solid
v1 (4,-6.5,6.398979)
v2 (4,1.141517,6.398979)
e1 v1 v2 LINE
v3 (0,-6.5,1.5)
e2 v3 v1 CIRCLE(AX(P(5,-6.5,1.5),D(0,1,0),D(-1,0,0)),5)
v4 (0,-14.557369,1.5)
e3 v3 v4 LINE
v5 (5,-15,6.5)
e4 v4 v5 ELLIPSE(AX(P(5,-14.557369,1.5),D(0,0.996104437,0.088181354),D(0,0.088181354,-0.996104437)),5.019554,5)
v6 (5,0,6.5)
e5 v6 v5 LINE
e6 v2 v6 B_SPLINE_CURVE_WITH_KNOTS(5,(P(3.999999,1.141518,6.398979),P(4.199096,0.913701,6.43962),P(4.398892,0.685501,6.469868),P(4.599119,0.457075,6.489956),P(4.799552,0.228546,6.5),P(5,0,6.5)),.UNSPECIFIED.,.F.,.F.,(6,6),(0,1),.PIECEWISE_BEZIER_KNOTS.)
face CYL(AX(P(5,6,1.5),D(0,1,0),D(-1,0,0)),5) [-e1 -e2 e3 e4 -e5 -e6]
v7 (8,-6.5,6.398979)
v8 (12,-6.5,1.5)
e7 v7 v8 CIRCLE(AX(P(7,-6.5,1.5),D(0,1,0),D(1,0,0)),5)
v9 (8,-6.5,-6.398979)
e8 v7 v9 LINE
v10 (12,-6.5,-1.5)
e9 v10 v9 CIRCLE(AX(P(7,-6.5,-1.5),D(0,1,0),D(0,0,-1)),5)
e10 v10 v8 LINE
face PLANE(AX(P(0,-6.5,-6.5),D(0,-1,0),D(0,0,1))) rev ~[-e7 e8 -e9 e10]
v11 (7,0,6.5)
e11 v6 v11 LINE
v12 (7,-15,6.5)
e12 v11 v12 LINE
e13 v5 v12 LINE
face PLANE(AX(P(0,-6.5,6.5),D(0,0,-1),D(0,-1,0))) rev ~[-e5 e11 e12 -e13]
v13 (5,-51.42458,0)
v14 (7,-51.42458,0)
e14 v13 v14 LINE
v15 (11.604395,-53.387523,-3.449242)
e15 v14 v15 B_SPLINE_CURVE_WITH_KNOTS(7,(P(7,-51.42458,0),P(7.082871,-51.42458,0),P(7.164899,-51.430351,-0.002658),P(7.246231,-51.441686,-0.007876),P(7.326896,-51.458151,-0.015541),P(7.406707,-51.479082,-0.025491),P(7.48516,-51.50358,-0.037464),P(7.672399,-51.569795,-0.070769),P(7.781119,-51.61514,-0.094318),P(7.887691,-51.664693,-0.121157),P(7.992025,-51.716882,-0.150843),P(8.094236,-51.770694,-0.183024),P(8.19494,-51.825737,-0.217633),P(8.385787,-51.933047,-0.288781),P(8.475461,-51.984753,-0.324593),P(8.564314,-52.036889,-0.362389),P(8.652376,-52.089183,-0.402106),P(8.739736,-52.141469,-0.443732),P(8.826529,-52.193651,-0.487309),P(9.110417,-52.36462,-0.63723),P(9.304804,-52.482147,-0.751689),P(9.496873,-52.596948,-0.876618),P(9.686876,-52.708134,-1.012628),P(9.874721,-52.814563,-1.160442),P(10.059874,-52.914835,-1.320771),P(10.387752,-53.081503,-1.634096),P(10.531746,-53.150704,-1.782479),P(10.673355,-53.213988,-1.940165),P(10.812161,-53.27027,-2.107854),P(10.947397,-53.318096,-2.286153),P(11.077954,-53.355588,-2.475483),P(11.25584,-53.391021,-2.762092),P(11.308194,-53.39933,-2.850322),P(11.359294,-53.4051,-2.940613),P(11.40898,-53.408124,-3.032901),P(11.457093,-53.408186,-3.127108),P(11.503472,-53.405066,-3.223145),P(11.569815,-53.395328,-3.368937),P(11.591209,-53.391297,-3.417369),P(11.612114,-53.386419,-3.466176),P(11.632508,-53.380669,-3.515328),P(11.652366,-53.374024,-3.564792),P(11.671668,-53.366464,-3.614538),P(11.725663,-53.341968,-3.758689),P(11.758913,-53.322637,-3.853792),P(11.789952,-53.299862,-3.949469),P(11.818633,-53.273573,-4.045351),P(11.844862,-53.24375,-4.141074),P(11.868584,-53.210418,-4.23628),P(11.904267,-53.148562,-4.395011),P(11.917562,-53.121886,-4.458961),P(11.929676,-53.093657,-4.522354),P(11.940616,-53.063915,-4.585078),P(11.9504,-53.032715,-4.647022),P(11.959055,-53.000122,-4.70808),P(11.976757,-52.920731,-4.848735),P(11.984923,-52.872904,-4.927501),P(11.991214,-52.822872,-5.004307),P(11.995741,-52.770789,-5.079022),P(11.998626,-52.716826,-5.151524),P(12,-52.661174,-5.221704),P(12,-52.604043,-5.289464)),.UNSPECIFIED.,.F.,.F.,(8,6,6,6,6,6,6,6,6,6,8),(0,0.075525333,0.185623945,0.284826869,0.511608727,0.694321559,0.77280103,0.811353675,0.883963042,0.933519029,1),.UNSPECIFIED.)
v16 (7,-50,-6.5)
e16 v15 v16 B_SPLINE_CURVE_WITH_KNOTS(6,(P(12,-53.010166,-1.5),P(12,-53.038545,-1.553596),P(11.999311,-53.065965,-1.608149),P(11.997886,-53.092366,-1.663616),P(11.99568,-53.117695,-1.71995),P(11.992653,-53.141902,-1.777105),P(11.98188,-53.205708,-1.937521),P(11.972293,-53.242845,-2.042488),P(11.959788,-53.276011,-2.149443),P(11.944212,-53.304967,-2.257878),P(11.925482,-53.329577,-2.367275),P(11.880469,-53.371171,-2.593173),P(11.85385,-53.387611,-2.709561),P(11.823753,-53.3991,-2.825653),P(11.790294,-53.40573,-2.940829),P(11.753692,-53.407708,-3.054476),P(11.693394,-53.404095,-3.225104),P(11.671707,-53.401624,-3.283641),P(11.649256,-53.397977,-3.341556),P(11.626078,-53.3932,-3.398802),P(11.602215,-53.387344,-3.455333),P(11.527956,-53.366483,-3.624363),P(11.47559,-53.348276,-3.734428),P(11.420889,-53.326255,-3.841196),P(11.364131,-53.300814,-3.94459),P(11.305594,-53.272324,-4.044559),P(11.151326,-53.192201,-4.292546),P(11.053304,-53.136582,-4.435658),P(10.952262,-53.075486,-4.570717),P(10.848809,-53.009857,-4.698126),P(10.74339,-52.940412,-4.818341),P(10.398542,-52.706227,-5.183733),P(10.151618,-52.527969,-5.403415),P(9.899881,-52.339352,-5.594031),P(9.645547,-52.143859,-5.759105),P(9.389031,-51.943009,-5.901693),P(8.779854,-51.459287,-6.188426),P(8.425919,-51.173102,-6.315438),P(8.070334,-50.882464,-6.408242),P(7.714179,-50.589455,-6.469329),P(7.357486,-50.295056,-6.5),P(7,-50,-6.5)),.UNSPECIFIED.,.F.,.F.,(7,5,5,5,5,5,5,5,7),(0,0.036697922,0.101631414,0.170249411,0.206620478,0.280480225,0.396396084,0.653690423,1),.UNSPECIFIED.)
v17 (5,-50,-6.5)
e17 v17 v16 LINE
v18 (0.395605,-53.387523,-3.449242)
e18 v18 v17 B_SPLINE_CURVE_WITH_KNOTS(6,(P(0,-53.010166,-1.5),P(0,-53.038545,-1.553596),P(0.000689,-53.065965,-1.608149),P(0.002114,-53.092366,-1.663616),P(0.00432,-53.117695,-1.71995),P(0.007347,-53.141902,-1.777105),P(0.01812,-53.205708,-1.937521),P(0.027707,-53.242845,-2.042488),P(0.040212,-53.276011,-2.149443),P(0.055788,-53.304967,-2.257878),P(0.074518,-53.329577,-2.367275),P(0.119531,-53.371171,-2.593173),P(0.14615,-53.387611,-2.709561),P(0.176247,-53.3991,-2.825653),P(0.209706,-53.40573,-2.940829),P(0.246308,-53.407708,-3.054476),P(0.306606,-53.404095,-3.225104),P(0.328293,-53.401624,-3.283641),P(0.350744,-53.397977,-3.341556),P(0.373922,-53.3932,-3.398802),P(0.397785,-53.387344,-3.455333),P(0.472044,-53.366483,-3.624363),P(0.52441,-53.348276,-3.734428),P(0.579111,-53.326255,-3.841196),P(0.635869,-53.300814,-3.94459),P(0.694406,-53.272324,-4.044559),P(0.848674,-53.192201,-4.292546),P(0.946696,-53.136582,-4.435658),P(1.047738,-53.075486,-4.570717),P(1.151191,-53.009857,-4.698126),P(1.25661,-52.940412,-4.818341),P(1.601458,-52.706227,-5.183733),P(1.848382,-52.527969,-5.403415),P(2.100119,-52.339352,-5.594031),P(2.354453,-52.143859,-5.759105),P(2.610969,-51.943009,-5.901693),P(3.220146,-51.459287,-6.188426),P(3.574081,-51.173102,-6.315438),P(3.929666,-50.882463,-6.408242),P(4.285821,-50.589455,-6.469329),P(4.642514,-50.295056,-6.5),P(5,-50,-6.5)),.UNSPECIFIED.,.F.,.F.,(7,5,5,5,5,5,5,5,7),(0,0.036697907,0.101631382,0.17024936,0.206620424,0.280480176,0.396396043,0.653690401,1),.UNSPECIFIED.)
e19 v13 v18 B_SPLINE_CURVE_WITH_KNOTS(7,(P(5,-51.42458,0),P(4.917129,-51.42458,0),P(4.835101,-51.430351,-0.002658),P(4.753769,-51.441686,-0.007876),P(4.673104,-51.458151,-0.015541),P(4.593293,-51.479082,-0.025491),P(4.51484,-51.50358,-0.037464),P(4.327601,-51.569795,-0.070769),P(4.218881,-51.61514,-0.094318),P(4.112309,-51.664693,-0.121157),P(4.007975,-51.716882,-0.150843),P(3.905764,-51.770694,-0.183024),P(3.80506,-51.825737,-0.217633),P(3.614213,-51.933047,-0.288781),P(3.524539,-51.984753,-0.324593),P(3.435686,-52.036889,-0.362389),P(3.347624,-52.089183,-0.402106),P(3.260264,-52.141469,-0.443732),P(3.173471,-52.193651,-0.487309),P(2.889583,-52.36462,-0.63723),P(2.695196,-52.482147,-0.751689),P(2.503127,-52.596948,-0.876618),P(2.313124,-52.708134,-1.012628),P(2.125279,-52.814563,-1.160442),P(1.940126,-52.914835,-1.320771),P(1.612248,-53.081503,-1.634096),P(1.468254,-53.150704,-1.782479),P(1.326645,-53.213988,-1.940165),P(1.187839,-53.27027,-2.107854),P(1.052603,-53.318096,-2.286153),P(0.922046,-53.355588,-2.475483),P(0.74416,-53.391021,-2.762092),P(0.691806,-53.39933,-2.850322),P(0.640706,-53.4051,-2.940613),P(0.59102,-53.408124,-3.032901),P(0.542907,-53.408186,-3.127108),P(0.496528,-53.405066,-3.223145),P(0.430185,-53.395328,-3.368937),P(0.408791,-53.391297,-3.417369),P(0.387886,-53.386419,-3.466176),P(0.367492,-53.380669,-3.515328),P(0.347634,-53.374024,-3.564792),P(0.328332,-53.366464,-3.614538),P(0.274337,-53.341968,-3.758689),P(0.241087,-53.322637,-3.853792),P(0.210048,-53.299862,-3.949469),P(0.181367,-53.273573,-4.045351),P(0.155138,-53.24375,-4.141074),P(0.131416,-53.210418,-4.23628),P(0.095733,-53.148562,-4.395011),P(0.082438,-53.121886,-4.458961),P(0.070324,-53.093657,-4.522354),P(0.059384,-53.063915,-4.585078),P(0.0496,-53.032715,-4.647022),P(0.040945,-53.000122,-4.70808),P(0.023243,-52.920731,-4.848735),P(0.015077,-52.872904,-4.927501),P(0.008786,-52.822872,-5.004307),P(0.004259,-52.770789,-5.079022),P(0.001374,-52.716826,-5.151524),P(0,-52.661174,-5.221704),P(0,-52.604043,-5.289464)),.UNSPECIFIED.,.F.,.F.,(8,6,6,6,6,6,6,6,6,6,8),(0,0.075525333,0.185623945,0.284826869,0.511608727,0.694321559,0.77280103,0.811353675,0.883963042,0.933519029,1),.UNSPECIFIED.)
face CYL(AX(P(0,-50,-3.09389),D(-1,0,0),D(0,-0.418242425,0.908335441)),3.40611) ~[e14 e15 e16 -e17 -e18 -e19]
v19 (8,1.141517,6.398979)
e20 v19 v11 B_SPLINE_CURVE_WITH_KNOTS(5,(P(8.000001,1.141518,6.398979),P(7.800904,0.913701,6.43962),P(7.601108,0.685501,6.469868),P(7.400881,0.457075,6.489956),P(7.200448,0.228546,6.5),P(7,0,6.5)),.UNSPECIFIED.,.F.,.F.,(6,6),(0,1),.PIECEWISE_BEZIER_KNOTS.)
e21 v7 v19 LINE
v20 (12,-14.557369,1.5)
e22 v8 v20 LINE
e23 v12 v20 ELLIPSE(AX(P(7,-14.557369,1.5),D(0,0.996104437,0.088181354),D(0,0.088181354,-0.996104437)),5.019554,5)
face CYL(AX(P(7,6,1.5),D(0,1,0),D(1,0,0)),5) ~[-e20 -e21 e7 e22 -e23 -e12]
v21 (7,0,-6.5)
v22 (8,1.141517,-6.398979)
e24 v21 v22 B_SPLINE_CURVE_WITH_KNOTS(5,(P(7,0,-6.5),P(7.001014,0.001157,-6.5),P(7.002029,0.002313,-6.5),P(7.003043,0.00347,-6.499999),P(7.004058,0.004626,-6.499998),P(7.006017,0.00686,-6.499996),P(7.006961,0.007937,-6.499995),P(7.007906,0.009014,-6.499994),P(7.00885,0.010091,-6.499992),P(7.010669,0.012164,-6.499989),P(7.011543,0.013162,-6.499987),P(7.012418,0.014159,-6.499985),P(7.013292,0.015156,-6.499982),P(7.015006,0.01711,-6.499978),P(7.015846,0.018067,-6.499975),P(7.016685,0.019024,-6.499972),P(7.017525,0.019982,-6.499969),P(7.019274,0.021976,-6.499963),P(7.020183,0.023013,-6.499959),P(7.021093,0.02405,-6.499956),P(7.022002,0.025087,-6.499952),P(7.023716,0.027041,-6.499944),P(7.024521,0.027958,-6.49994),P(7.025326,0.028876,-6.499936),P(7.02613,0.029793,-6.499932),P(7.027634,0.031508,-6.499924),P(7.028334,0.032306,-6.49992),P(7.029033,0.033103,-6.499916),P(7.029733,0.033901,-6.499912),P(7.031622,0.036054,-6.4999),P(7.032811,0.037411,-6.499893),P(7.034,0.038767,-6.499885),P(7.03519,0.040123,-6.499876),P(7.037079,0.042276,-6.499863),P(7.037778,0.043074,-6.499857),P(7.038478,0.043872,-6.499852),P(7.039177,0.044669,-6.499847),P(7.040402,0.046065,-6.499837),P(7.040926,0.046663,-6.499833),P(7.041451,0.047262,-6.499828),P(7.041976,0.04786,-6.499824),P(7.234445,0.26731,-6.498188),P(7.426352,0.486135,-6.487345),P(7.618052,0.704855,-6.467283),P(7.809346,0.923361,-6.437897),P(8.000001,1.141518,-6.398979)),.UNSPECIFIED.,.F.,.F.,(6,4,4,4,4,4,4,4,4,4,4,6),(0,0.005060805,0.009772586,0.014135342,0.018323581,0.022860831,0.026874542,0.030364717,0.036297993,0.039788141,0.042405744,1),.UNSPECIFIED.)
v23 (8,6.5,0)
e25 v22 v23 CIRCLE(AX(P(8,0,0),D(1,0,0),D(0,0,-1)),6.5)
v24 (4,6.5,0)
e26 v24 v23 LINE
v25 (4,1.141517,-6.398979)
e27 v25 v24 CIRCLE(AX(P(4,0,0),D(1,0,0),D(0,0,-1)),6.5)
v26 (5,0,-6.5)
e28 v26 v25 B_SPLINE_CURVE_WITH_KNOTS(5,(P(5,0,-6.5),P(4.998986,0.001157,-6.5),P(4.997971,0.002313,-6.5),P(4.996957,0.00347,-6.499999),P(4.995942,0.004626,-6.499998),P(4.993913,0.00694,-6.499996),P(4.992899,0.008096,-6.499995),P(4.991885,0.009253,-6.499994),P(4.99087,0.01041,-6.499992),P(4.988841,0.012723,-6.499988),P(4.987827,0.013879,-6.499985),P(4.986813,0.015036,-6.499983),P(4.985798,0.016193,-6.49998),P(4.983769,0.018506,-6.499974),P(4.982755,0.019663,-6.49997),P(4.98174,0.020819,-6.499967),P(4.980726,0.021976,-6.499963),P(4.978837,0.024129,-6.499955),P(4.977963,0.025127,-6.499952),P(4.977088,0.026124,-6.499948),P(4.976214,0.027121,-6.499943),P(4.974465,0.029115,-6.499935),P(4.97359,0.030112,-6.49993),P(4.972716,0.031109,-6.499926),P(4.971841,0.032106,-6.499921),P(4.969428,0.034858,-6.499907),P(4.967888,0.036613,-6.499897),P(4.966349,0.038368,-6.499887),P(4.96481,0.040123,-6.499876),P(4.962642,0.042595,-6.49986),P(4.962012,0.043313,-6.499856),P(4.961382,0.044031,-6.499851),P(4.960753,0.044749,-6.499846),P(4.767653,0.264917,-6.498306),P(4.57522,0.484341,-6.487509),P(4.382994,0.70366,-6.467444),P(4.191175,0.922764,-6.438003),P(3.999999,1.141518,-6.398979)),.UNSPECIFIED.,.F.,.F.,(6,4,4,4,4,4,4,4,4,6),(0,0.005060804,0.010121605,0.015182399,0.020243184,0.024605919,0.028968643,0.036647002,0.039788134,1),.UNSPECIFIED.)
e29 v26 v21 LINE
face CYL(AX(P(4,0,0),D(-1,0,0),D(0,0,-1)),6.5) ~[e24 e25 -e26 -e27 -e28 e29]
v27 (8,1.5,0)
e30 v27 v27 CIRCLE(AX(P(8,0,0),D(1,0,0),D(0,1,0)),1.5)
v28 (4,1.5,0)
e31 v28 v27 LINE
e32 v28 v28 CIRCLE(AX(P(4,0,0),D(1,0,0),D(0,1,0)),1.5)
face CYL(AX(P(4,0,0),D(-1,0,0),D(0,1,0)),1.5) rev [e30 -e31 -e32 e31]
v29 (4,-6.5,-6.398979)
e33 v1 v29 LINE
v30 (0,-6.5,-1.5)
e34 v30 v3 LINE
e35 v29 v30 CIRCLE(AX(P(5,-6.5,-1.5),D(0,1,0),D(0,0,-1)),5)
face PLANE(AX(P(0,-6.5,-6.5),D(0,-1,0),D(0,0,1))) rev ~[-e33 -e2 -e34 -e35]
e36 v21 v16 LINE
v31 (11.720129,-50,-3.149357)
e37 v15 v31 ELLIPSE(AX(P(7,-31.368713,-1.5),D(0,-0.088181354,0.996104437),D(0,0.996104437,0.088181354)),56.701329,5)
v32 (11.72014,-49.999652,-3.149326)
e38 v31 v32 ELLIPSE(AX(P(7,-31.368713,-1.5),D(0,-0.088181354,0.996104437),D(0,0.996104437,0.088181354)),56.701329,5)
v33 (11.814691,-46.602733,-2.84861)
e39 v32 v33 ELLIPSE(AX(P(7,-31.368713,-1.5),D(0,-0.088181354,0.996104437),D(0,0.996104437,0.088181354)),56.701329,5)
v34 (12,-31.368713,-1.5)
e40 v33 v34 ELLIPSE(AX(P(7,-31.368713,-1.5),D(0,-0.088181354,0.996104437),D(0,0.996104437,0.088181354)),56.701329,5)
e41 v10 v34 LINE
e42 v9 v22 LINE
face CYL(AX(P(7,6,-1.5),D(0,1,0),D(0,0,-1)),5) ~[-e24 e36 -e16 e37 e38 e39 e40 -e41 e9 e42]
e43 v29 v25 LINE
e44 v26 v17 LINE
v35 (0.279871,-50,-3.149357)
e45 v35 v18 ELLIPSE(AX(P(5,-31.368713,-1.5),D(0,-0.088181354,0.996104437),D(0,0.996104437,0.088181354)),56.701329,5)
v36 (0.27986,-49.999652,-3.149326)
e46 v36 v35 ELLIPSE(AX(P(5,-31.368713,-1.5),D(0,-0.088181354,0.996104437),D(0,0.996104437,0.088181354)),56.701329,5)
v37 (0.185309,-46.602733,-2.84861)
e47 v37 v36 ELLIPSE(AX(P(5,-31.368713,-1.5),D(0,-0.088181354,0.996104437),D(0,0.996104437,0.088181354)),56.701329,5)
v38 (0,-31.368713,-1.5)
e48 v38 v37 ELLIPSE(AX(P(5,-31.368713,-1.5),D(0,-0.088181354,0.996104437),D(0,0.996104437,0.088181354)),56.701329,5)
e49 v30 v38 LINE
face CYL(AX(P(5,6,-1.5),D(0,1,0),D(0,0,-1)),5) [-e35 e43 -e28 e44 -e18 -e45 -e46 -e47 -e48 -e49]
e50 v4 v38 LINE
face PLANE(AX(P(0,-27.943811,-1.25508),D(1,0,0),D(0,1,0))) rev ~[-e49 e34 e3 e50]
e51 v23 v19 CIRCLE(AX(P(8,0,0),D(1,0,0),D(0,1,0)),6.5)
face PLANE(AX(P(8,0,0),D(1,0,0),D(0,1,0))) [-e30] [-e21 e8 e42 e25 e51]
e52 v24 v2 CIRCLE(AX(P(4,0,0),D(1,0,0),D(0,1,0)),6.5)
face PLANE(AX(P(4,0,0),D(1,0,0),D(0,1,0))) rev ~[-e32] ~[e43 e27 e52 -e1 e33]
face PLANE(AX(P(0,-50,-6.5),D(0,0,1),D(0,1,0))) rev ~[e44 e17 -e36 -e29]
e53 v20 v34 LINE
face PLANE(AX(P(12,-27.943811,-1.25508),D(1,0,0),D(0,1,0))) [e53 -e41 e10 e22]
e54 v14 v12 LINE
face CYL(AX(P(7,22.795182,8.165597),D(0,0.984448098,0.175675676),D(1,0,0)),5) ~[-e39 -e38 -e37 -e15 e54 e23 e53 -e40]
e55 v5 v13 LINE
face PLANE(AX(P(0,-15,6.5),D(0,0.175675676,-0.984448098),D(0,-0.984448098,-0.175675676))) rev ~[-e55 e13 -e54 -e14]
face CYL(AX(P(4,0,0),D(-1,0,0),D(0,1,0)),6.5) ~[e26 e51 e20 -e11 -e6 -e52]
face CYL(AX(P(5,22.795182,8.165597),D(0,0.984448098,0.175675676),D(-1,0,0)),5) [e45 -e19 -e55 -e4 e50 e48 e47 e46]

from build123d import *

# Parameters (mm, degrees)
F1_DEPTH     = 12
F2_START     = 4
F0_R         = 1.5
F2_DEPTH     = 4
F3_T1_DEPTH  = 58.5
F3_T3_DEPTH  = 87
F3_T5_DEPTH  = 68.5
F3_T10_ANGLE = 359.64
F3_S11_R     = 5
F3_T12_DEPTH = 7
F3_T16_ANGLE = 359.64
F3_S17_R     = 5
F3_T18_DEPTH = 7
F3_T22_ANGLE = 359.64
F3_S23_R     = 5
F3_T24_DEPTH = 7
F3_T28_ANGLE = 359.64
F3_S29_R     = 5
F3_T30_DEPTH = 7


# Not quite as in the source:
# - a fillet or chamfer that OpenCascade refuses, or shapes differently, is made with other operations: its cross-section is extruded or revolved along the edge and cut away or added


with BuildPart() as f1:
    # F0 (on Right) → F1 (new body)
    with BuildSketch(Plane.YZ):
        with BuildLine():
            Line((-6.5, -6.5), (-6.5, 0))
            Line((-6.5, 0), (-6.5, 6.5))
            Line((-6.5, 6.5), (-15, 6.5))
            Line((-15, 6.5), (-51.4245796132, 0))
            ThreePointArc((-51.4245796132, 0), (-53.3271394273, -3.8230863787), (-50, -6.5))
            Line((-50, -6.5), (-6.5, -6.5))
        make_face()
    extrude(amount=F1_DEPTH)

    # F0 (on Right) → F2 (join)
    with BuildSketch(Plane.YZ.offset(F2_START)):
        with BuildLine():
            ThreePointArc((0, -6.5), (4.5961940777, -4.5961940777), (6.5, 0))
            ThreePointArc((6.5, 0), (4.5961940777, 4.5961940777), (0, 6.5))
            ThreePointArc((0, 6.5), (-4.5961940777, 4.5961940777), (-6.5, 0))
            ThreePointArc((-6.5, 0), (-4.5961940777, -4.5961940777), (0, -6.5))
        make_face()
        Circle(F0_R, mode=Mode.SUBTRACT)
        with BuildLine():
            ThreePointArc((-6.5, 0), (-4.5961940777, 4.5961940777), (0, 6.5))
            Line((0, 6.5), (-6.5, 6.5))
            Line((-6.5, 6.5), (-6.5, 0))
        make_face()
        with BuildLine():
            Line((-6.5, -6.5), (0, -6.5))
            ThreePointArc((0, -6.5), (-4.5961940777, -4.5961940777), (-6.5, 0))
            Line((-6.5, 0), (-6.5, -6.5))
        make_face()
    extrude(amount=F2_DEPTH)

    # F3: fillet of radius 5 on 6 edges, made by hand

    # F3_s2 → F3_t1 (cut)
    with BuildSketch(Plane.XZ.offset(-6)):
        with BuildLine():
            ThreePointArc((12, 1.5), (10.5355339059, 5.0355339059), (7, 6.5))
            Line((7, 6.5), (12, 6.5))
            Line((12, 6.5), (12, 1.5))
        make_face()
        with BuildLine():
            ThreePointArc((0, 1.5), (1.4644660941, 5.0355339059), (5, 6.5))
            Line((5, 6.5), (0, 6.5))
            Line((0, 6.5), (0, 1.5))
        make_face()
    extrude(amount=F3_T1_DEPTH, mode=Mode.SUBTRACT)

    # F3_s4 → F3_t3 (cut)
    with BuildSketch(Plane(origin=(0, 23.5038661081, 4.1942866966), x_dir=(1, 0, 0), z_dir=(0, -0.9844480977, -0.1756756757))):
        with BuildLine():
            ThreePointArc((12, 4.0340477699), (10.5355339059, 7.5695816758), (7, 9.0340477699))
            Line((7, 9.0340477699), (12, 9.0340477699))
            Line((12, 9.0340477699), (12, 4.0340477699))
        make_face()
        with BuildLine():
            ThreePointArc((0, 4.0340477699), (1.4644660941, 7.5695816758), (5, 9.0340477699))
            Line((5, 9.0340477699), (0, 9.0340477699))
            Line((0, 9.0340477699), (0, 4.0340477699))
        make_face()
    extrude(amount=F3_T3_DEPTH, mode=Mode.SUBTRACT)

    # F3_s6 → F3_t5 (cut)
    with BuildSketch(Plane.XZ.offset(-6)):
        with BuildLine():
            ThreePointArc((5, -6.5), (1.4644660941, -5.0355339059), (0, -1.5))
            Line((0, -1.5), (0, -6.5))
            Line((0, -6.5), (5, -6.5))
        make_face()
        with BuildLine():
            ThreePointArc((7, -6.5), (10.5355339059, -5.0355339059), (12, -1.5))
            Line((12, -1.5), (12, -6.5))
            Line((12, -6.5), (7, -6.5))
        make_face()
    extrude(amount=F3_T5_DEPTH, mode=Mode.SUBTRACT)


with BuildPart() as f3_tool8:
    # F3_s9 → F3_t10 (revolve)
    with BuildSketch(Plane(origin=(0, -50.0174650791, -0.3142731374), x_dir=(1, 0, 0), z_dir=(0, -0.9999802609, -0.006283144))):
        with BuildLine():
            ThreePointArc((7, -6.185781731), (9.9180943161, -5.2459203447), (11.7391469644, -2.779671956))
            Line((11.7391469644, -2.779671956), (12, -2.779671956))
            Line((12, -2.779671956), (12, -6.185781731))
            Line((12, -6.185781731), (7, -6.185781731))
        make_face()
    revolve(axis=Axis((12, -50, -3.093890225), (1, 0, 0)), revolution_arc=F3_T10_ANGLE)

    # F3_s11 → F3_t12 (cut, symmetric)
    with BuildSketch(Plane(origin=(0, -49.0255152632, -8.7486486486), x_dir=(1, 0, 0), z_dir=(0, 0.9844480977, 0.1756756757))):
        with Locations((7, -4.0340477699)):
            Circle(F3_S11_R)
    extrude(amount=F3_T12_DEPTH, both=True, mode=Mode.SUBTRACT)


with BuildPart() as f1_1:
    add(f1.part)

    # F3_t7: cut F3_tool8
    add(f3_tool8.part, mode=Mode.SUBTRACT)


with BuildPart() as f3_tool14:
    # F3_s15 → F3_t16 (revolve)
    with BuildSketch(Plane(origin=(0, -50.0174650791, -0.3142731374), x_dir=(1, 0, 0), z_dir=(0, -0.9999802609, -0.006283144))):
        with BuildLine():
            ThreePointArc((7, -6.185781731), (9.9180943161, -5.2459203447), (11.7391469644, -2.779671956))
            Line((11.7391469644, -2.779671956), (12, -2.779671956))
            Line((12, -2.779671956), (12, -6.185781731))
            Line((12, -6.185781731), (7, -6.185781731))
        make_face()
    revolve(axis=Axis((12, -50, -3.093890225), (1, 0, 0)), revolution_arc=F3_T16_ANGLE)

    # F3_s17 → F3_t18 (cut, symmetric)
    with BuildSketch(Plane.XZ.offset(50)):
        with Locations((7, -1.5)):
            Circle(F3_S17_R)
    extrude(amount=F3_T18_DEPTH, both=True, mode=Mode.SUBTRACT)


with BuildPart() as f1_2:
    add(f1_1.part)

    # F3_t13: cut F3_tool14
    add(f3_tool14.part, mode=Mode.SUBTRACT)


with BuildPart() as f3_tool20:
    # F3_s21 → F3_t22 (revolve)
    with BuildSketch(Plane(origin=(0, -50.0174650791, -0.3142731374), x_dir=(1, 0, 0), z_dir=(0, -0.9999802609, -0.006283144))):
        with BuildLine():
            ThreePointArc((5, -6.185781731), (2.0819056839, -5.2459203447), (0.2608530356, -2.779671956))
            Line((0.2608530356, -2.779671956), (0, -2.779671956))
            Line((0, -2.779671956), (0, -6.185781731))
            Line((0, -6.185781731), (5, -6.185781731))
        make_face()
    revolve(axis=Axis((0, -50, -3.093890225), (1, 0, 0)), revolution_arc=F3_T22_ANGLE)

    # F3_s23 → F3_t24 (cut, symmetric)
    with BuildSketch(Plane(origin=(0, -49.0255152632, -8.7486486486), x_dir=(1, 0, 0), z_dir=(0, 0.9844480977, 0.1756756757))):
        with Locations((5, -4.0340477699)):
            Circle(F3_S23_R)
    extrude(amount=F3_T24_DEPTH, both=True, mode=Mode.SUBTRACT)


with BuildPart() as f1_3:
    add(f1_2.part)

    # F3_t19: cut F3_tool20
    add(f3_tool20.part, mode=Mode.SUBTRACT)


with BuildPart() as f3_tool26:
    # F3_s27 → F3_t28 (revolve)
    with BuildSketch(Plane(origin=(0, -50.0174650791, -0.3142731374), x_dir=(1, 0, 0), z_dir=(0, -0.9999802609, -0.006283144))):
        with BuildLine():
            ThreePointArc((5, -6.185781731), (2.0819056839, -5.2459203447), (0.2608530356, -2.779671956))
            Line((0.2608530356, -2.779671956), (0, -2.779671956))
            Line((0, -2.779671956), (0, -6.185781731))
            Line((0, -6.185781731), (5, -6.185781731))
        make_face()
    revolve(axis=Axis((0, -50, -3.093890225), (1, 0, 0)), revolution_arc=F3_T28_ANGLE)

    # F3_s29 → F3_t30 (cut, symmetric)
    with BuildSketch(Plane.XZ.offset(50)):
        with Locations((5, -1.5)):
            Circle(F3_S29_R)
    extrude(amount=F3_T30_DEPTH, both=True, mode=Mode.SUBTRACT)


with BuildPart() as f1_4:
    add(f1_3.part)

    # F3_t25: cut F3_tool26
    add(f3_tool26.part, mode=Mode.SUBTRACT)


solid = f1_4.part
